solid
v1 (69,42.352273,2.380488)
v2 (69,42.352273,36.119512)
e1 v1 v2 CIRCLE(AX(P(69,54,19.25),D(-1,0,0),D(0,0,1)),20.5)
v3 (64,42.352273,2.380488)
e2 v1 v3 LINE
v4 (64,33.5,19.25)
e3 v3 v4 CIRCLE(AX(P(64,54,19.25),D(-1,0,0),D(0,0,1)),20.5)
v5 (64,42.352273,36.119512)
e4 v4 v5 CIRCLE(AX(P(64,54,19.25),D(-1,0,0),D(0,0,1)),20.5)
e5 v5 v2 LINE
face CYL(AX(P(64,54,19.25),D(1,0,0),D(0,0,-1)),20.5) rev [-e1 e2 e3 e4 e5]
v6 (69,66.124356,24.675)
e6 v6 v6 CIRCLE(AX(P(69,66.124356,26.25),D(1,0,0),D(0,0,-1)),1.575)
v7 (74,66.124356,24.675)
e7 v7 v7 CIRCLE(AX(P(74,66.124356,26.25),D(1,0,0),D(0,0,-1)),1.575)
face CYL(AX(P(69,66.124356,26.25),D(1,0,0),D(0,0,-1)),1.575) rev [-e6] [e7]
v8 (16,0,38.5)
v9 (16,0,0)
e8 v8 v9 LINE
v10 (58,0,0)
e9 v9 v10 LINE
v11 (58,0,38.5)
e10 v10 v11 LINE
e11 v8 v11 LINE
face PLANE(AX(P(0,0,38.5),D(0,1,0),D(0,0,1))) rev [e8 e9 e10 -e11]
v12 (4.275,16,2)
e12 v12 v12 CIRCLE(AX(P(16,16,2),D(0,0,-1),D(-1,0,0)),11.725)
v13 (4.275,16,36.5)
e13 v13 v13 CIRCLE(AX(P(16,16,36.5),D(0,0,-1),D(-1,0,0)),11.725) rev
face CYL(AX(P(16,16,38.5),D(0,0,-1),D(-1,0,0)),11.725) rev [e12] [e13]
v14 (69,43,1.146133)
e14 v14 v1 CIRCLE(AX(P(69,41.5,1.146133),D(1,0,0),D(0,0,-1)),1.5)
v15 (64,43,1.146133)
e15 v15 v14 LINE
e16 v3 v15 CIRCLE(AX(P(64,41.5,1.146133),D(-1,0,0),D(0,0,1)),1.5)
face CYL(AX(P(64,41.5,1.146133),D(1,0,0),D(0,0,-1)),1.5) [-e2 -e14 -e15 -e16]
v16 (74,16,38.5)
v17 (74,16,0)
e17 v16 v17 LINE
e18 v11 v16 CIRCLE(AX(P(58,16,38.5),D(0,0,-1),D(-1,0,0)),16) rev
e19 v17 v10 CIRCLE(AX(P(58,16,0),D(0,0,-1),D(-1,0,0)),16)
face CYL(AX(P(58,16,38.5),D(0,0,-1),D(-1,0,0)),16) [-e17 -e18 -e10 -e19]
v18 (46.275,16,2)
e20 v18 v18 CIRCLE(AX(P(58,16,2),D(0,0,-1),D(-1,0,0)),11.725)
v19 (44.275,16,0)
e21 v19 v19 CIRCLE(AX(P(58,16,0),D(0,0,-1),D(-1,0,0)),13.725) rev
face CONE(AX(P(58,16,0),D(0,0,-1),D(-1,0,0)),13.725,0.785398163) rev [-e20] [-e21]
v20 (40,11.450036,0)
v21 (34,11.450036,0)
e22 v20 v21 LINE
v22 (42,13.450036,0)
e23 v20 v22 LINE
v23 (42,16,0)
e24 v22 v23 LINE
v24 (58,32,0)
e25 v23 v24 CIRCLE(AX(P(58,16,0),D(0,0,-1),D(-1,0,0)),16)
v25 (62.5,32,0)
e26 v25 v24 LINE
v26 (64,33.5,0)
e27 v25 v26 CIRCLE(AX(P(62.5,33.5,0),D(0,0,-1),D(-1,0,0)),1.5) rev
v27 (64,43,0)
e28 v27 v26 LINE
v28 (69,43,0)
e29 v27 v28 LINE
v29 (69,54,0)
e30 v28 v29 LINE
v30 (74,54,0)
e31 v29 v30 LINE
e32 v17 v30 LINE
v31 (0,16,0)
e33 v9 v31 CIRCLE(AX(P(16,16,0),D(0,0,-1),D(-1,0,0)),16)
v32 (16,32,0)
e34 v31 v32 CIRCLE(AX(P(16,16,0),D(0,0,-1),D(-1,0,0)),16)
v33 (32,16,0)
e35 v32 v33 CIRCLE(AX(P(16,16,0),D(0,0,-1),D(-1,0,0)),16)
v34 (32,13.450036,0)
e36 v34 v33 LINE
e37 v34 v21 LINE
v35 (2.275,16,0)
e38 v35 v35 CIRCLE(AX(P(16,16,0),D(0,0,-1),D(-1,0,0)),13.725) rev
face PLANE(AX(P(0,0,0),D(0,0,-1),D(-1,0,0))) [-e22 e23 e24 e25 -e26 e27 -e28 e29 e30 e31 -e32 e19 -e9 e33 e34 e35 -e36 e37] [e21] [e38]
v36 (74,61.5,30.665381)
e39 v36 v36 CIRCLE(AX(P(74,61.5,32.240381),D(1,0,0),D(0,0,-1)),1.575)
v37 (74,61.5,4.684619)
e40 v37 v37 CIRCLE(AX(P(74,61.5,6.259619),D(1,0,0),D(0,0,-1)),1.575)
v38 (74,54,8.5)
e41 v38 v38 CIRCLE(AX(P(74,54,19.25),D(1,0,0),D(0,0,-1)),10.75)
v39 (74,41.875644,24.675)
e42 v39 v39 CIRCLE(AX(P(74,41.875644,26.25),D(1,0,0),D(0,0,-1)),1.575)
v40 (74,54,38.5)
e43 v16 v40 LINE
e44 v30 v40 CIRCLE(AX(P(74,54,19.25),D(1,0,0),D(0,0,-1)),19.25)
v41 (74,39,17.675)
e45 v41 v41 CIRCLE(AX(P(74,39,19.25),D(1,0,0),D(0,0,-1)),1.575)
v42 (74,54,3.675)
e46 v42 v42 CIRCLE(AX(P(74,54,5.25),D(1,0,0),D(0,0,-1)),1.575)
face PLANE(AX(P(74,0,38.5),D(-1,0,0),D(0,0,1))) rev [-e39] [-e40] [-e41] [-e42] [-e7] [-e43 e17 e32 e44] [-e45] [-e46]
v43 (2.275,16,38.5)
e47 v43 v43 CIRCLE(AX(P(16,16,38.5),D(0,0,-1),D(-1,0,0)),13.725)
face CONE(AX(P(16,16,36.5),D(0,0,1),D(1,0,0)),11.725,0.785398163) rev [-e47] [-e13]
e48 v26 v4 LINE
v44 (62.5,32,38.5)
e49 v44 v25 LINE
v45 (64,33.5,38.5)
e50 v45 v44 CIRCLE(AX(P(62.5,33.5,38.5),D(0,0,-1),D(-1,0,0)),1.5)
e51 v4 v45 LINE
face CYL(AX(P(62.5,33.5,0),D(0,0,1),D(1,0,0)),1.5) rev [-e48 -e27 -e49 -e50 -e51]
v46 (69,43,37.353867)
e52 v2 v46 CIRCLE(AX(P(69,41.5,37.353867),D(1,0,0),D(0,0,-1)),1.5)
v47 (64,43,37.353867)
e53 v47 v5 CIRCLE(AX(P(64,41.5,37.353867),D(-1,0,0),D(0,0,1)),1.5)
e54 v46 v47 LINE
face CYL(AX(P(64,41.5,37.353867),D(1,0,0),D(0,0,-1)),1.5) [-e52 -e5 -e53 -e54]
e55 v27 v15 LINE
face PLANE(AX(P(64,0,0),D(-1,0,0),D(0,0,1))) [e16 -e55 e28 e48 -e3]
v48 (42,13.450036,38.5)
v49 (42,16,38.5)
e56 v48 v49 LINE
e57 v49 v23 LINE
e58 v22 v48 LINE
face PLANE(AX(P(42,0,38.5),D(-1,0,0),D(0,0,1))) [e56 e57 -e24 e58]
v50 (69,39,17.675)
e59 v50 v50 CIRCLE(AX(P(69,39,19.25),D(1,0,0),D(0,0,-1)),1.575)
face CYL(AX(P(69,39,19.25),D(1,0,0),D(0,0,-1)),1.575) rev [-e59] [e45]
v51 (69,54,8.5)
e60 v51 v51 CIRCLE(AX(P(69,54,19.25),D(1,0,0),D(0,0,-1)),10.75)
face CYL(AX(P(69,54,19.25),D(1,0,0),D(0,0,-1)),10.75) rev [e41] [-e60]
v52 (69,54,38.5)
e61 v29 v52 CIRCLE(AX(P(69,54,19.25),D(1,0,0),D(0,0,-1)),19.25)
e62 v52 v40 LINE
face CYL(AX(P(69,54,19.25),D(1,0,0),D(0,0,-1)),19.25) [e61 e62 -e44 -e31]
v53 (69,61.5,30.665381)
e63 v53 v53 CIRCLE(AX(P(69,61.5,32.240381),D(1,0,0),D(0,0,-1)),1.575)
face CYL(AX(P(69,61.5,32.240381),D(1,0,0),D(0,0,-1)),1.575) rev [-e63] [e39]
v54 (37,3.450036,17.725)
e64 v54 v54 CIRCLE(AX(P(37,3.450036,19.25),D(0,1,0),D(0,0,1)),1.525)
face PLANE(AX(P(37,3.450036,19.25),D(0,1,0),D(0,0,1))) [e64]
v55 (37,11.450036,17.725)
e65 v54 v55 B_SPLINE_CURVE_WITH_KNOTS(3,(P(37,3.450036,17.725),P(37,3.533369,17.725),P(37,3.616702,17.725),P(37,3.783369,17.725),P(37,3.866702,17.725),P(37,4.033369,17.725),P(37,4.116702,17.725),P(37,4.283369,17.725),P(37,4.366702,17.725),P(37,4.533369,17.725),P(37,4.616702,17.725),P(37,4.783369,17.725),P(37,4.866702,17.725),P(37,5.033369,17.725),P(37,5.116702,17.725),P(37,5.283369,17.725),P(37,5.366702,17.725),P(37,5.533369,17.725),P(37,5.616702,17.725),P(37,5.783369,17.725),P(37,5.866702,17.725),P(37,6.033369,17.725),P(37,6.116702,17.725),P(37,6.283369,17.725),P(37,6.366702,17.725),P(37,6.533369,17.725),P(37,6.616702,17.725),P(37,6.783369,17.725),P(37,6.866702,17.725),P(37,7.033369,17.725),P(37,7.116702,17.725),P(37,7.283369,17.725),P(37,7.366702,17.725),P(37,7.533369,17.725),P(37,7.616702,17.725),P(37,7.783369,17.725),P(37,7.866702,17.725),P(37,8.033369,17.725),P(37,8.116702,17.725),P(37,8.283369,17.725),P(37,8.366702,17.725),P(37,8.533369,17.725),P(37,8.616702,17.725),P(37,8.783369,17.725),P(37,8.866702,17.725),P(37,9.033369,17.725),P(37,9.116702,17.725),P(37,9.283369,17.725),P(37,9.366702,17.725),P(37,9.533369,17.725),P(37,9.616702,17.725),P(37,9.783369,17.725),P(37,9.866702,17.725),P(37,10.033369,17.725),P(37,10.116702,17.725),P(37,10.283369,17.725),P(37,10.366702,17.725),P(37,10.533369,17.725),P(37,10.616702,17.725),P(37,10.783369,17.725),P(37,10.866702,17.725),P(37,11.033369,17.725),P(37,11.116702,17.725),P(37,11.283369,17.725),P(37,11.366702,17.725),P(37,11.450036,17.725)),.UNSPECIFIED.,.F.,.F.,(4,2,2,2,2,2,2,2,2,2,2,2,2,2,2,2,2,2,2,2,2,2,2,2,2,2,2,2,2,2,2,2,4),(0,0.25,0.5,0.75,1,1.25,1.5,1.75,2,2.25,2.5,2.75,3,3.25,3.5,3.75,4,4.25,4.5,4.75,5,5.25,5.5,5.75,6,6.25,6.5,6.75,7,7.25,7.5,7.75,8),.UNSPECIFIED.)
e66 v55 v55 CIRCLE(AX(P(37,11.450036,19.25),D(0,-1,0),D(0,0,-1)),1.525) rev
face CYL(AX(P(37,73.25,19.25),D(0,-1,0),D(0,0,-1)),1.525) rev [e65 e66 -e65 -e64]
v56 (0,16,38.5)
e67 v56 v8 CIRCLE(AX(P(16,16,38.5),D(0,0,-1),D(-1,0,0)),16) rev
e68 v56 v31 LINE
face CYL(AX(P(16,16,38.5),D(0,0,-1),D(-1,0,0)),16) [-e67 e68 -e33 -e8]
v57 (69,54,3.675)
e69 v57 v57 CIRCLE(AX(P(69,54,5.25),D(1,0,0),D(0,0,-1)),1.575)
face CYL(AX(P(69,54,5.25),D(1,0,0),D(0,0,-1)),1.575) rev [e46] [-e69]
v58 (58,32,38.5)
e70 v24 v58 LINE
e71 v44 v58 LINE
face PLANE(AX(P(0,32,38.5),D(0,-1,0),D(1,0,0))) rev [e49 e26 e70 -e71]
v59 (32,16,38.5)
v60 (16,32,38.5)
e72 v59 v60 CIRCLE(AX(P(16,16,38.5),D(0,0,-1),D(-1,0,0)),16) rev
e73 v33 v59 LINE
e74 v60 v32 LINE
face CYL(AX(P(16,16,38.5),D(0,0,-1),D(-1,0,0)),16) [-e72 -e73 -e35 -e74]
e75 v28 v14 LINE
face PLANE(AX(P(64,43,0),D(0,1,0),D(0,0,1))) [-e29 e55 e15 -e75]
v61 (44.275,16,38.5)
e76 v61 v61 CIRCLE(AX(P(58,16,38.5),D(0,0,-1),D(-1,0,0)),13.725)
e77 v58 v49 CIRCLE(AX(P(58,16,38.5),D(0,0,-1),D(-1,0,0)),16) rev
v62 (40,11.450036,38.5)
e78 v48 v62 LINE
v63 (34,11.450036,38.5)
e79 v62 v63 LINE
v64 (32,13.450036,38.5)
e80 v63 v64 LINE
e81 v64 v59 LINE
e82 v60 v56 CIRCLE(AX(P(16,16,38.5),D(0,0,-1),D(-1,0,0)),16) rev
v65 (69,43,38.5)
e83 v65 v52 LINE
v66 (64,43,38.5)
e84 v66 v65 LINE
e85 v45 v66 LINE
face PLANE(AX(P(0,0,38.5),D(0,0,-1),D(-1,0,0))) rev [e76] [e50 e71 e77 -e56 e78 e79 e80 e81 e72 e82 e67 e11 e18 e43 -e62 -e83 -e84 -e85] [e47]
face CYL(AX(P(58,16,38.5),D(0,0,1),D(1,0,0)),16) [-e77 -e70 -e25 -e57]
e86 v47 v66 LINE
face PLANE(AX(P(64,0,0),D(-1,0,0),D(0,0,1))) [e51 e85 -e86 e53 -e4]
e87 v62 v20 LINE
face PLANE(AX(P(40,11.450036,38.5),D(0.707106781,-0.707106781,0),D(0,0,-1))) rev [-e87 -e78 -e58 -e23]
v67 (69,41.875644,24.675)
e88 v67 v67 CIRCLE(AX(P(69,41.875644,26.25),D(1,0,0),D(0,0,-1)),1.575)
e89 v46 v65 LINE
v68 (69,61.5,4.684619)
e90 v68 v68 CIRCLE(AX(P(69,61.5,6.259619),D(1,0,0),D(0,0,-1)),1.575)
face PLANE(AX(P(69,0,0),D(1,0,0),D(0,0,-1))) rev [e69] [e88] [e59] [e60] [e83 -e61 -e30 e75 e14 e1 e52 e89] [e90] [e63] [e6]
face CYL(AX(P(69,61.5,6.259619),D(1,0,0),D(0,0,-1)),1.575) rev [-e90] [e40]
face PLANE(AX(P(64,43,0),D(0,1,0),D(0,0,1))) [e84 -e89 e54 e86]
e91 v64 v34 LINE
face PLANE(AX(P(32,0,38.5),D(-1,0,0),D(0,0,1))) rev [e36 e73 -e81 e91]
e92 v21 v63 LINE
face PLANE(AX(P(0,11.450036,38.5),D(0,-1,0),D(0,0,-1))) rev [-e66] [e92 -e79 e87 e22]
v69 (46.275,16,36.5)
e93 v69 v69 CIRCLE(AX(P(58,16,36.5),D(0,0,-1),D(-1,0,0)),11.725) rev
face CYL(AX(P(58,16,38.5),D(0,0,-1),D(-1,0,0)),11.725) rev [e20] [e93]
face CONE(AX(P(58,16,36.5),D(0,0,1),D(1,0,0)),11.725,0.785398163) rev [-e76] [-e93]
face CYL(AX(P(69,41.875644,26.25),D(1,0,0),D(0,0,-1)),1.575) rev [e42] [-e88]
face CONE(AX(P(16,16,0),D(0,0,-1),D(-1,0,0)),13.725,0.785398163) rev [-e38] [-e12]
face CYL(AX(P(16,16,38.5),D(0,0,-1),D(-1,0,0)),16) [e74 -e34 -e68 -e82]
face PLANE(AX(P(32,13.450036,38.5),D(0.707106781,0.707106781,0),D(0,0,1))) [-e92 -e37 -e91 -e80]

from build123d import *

# Parameters (mm, degrees)
SKETCH1_W               = 74
SKETCH1_H               = 32
SKETCH1_R               = 11.725
BOSS_EXTRUDE1_DEPTH     = 38.5
SKETCH2_R               = 1.575
SKETCH2_R_2             = 10.75
BOSS_EXTRUDE2_DEPTH     = 5
BOSS_EXTRUDE3_DEPTH     = 5
CUT_EXTRUDE1_DEPTH      = 112.012668196
CUT_EXTRUDE1_DEPTH_BACK = 112.012668196
SKETCH4_W               = 10
SKETCH4_H               = 25
SKETCH4_H_2             = 4.450035805
CUT_EXTRUDE2_DEPTH      = 104.814669361
CUT_EXTRUDE2_DEPTH_BACK = 8
SKETCH5_R               = 1.525
FILLET8_R               = 16
FILLET9_R               = 1.5
FILLET10_SIZE           = 2


with BuildPart() as part:
    # Sketch1 → Boss-Extrude1 (new body)
    with BuildSketch(Plane.XY):
        with Locations((37, 16)):
            Rectangle(SKETCH1_W, SKETCH1_H)
        with Locations((16, 16)):
            Circle(SKETCH1_R, mode=Mode.SUBTRACT)
        with Locations((58, 16)):
            Circle(SKETCH1_R, mode=Mode.SUBTRACT)
    extrude(amount=BOSS_EXTRUDE1_DEPTH)

    # Sketch2 → Boss-Extrude2 (add)
    with BuildSketch(Plane(origin=(74, 0, 0), x_dir=(0, 0, -1), z_dir=(1, 0, 0))):
        with BuildLine():
            Line((-38.5, 32), (0, 32))
            Line((0, 32), (0, 54))
            ThreePointArc((0, 54), (-19.25, 73.25), (-38.5, 54))
            Line((-38.5, 54), (-38.5, 32))
        make_face()
        with Locations((-6.259618943, 61.5)):
            Circle(SKETCH2_R, mode=Mode.SUBTRACT)
        with Locations((-26.25, 41.875644347)):
            Circle(SKETCH2_R, mode=Mode.SUBTRACT)
        with Locations((-32.240381057, 61.5)):
            Circle(SKETCH2_R, mode=Mode.SUBTRACT)
        with Locations((-26.25, 66.124355653)):
            Circle(SKETCH2_R, mode=Mode.SUBTRACT)
        with Locations((-19.25, 39)):
            Circle(SKETCH2_R, mode=Mode.SUBTRACT)
        with Locations((-19.25, 54)):
            Circle(SKETCH2_R_2, mode=Mode.SUBTRACT)
        with Locations((-5.25, 54)):
            Circle(SKETCH2_R, mode=Mode.SUBTRACT)
    extrude(amount=-BOSS_EXTRUDE2_DEPTH)

    # Sketch3 → Boss-Extrude3 (add)
    with BuildSketch(Plane.ZY.offset(-69)):
        with BuildLine():
            Line((0, 43), (0, 32))
            Line((0, 32), (38.5, 32))
            Line((38.5, 32), (38.5, 43))
            Line((38.5, 43), (36.548843892, 43))
            ThreePointArc((36.548843892, 43), (19.25, 33.5), (1.951156108, 43))
            Line((1.951156108, 43), (0, 43))
        make_face()
    extrude(amount=BOSS_EXTRUDE3_DEPTH)

    # Sketch4 → Cut-Extrude1 (cut, two sides: drawn at the far end of the back side and taken through both)
    with BuildSketch(Plane(origin=(0, 0, 0), x_dir=(-1, 0, 0), z_dir=(0, 0, -1)).offset(-CUT_EXTRUDE1_DEPTH_BACK)):
        with Locations((-37, 23.950035805)):
            Rectangle(SKETCH4_W, SKETCH4_H)
        with Locations((-37, 34.225017902)):
            Rectangle(SKETCH4_W, SKETCH4_H_2)
    extrude(amount=CUT_EXTRUDE1_DEPTH + CUT_EXTRUDE1_DEPTH_BACK, mode=Mode.SUBTRACT)

    # Sketch5 → Cut-Extrude2 (cut, two sides: drawn at the far end of the back side and taken through both)
    with BuildSketch(Plane(origin=(0, 11.450035805, 0), x_dir=(1, 0, 0), z_dir=(0, 1, 0)).offset(-CUT_EXTRUDE2_DEPTH_BACK)):
        with Locations(Location((37, -19.25, 0), (0, 0, 90))):
            Circle(SKETCH5_R)
    extrude(amount=CUT_EXTRUDE2_DEPTH + CUT_EXTRUDE2_DEPTH_BACK, mode=Mode.SUBTRACT)

    # Fillet8
    fillet8_edges = [part.edges().sort_by_distance(p)[0] for p in [
        (42, 32, 19.25),
        (32, 32, 19.25),
        (0, 32, 19.25),
        (0, 0, 19.25),
        (74, 0, 19.25),
    ]]
    fillet(fillet8_edges, radius=FILLET8_R - 0.0001)  # a hair under: the kernel refuses the full size

    # Fillet9
    fillet9_edges = [part.edges().sort_by_distance(p)[0] for p in [
        (66.5, 43, 36.548843892),
        (66.5, 43, 1.951156108),
        (64, 32, 19.25),
    ]]
    fillet(fillet9_edges, radius=FILLET9_R - 0.0001)  # a hair under: the kernel refuses the full size

    # Fillet10
    fillet10_edges = [part.edges().sort_by_distance(p)[0] for p in [
        (4.275, 16, 0),
        (4.275, 16, 38.5),
        (46.275, 16, 0),
        (46.275, 16, 38.5),
        (42, 11.450035805, 19.25),
        (32, 11.450035805, 19.25),
    ]]
    chamfer(fillet10_edges, length=FILLET10_SIZE)


solid = part.part
